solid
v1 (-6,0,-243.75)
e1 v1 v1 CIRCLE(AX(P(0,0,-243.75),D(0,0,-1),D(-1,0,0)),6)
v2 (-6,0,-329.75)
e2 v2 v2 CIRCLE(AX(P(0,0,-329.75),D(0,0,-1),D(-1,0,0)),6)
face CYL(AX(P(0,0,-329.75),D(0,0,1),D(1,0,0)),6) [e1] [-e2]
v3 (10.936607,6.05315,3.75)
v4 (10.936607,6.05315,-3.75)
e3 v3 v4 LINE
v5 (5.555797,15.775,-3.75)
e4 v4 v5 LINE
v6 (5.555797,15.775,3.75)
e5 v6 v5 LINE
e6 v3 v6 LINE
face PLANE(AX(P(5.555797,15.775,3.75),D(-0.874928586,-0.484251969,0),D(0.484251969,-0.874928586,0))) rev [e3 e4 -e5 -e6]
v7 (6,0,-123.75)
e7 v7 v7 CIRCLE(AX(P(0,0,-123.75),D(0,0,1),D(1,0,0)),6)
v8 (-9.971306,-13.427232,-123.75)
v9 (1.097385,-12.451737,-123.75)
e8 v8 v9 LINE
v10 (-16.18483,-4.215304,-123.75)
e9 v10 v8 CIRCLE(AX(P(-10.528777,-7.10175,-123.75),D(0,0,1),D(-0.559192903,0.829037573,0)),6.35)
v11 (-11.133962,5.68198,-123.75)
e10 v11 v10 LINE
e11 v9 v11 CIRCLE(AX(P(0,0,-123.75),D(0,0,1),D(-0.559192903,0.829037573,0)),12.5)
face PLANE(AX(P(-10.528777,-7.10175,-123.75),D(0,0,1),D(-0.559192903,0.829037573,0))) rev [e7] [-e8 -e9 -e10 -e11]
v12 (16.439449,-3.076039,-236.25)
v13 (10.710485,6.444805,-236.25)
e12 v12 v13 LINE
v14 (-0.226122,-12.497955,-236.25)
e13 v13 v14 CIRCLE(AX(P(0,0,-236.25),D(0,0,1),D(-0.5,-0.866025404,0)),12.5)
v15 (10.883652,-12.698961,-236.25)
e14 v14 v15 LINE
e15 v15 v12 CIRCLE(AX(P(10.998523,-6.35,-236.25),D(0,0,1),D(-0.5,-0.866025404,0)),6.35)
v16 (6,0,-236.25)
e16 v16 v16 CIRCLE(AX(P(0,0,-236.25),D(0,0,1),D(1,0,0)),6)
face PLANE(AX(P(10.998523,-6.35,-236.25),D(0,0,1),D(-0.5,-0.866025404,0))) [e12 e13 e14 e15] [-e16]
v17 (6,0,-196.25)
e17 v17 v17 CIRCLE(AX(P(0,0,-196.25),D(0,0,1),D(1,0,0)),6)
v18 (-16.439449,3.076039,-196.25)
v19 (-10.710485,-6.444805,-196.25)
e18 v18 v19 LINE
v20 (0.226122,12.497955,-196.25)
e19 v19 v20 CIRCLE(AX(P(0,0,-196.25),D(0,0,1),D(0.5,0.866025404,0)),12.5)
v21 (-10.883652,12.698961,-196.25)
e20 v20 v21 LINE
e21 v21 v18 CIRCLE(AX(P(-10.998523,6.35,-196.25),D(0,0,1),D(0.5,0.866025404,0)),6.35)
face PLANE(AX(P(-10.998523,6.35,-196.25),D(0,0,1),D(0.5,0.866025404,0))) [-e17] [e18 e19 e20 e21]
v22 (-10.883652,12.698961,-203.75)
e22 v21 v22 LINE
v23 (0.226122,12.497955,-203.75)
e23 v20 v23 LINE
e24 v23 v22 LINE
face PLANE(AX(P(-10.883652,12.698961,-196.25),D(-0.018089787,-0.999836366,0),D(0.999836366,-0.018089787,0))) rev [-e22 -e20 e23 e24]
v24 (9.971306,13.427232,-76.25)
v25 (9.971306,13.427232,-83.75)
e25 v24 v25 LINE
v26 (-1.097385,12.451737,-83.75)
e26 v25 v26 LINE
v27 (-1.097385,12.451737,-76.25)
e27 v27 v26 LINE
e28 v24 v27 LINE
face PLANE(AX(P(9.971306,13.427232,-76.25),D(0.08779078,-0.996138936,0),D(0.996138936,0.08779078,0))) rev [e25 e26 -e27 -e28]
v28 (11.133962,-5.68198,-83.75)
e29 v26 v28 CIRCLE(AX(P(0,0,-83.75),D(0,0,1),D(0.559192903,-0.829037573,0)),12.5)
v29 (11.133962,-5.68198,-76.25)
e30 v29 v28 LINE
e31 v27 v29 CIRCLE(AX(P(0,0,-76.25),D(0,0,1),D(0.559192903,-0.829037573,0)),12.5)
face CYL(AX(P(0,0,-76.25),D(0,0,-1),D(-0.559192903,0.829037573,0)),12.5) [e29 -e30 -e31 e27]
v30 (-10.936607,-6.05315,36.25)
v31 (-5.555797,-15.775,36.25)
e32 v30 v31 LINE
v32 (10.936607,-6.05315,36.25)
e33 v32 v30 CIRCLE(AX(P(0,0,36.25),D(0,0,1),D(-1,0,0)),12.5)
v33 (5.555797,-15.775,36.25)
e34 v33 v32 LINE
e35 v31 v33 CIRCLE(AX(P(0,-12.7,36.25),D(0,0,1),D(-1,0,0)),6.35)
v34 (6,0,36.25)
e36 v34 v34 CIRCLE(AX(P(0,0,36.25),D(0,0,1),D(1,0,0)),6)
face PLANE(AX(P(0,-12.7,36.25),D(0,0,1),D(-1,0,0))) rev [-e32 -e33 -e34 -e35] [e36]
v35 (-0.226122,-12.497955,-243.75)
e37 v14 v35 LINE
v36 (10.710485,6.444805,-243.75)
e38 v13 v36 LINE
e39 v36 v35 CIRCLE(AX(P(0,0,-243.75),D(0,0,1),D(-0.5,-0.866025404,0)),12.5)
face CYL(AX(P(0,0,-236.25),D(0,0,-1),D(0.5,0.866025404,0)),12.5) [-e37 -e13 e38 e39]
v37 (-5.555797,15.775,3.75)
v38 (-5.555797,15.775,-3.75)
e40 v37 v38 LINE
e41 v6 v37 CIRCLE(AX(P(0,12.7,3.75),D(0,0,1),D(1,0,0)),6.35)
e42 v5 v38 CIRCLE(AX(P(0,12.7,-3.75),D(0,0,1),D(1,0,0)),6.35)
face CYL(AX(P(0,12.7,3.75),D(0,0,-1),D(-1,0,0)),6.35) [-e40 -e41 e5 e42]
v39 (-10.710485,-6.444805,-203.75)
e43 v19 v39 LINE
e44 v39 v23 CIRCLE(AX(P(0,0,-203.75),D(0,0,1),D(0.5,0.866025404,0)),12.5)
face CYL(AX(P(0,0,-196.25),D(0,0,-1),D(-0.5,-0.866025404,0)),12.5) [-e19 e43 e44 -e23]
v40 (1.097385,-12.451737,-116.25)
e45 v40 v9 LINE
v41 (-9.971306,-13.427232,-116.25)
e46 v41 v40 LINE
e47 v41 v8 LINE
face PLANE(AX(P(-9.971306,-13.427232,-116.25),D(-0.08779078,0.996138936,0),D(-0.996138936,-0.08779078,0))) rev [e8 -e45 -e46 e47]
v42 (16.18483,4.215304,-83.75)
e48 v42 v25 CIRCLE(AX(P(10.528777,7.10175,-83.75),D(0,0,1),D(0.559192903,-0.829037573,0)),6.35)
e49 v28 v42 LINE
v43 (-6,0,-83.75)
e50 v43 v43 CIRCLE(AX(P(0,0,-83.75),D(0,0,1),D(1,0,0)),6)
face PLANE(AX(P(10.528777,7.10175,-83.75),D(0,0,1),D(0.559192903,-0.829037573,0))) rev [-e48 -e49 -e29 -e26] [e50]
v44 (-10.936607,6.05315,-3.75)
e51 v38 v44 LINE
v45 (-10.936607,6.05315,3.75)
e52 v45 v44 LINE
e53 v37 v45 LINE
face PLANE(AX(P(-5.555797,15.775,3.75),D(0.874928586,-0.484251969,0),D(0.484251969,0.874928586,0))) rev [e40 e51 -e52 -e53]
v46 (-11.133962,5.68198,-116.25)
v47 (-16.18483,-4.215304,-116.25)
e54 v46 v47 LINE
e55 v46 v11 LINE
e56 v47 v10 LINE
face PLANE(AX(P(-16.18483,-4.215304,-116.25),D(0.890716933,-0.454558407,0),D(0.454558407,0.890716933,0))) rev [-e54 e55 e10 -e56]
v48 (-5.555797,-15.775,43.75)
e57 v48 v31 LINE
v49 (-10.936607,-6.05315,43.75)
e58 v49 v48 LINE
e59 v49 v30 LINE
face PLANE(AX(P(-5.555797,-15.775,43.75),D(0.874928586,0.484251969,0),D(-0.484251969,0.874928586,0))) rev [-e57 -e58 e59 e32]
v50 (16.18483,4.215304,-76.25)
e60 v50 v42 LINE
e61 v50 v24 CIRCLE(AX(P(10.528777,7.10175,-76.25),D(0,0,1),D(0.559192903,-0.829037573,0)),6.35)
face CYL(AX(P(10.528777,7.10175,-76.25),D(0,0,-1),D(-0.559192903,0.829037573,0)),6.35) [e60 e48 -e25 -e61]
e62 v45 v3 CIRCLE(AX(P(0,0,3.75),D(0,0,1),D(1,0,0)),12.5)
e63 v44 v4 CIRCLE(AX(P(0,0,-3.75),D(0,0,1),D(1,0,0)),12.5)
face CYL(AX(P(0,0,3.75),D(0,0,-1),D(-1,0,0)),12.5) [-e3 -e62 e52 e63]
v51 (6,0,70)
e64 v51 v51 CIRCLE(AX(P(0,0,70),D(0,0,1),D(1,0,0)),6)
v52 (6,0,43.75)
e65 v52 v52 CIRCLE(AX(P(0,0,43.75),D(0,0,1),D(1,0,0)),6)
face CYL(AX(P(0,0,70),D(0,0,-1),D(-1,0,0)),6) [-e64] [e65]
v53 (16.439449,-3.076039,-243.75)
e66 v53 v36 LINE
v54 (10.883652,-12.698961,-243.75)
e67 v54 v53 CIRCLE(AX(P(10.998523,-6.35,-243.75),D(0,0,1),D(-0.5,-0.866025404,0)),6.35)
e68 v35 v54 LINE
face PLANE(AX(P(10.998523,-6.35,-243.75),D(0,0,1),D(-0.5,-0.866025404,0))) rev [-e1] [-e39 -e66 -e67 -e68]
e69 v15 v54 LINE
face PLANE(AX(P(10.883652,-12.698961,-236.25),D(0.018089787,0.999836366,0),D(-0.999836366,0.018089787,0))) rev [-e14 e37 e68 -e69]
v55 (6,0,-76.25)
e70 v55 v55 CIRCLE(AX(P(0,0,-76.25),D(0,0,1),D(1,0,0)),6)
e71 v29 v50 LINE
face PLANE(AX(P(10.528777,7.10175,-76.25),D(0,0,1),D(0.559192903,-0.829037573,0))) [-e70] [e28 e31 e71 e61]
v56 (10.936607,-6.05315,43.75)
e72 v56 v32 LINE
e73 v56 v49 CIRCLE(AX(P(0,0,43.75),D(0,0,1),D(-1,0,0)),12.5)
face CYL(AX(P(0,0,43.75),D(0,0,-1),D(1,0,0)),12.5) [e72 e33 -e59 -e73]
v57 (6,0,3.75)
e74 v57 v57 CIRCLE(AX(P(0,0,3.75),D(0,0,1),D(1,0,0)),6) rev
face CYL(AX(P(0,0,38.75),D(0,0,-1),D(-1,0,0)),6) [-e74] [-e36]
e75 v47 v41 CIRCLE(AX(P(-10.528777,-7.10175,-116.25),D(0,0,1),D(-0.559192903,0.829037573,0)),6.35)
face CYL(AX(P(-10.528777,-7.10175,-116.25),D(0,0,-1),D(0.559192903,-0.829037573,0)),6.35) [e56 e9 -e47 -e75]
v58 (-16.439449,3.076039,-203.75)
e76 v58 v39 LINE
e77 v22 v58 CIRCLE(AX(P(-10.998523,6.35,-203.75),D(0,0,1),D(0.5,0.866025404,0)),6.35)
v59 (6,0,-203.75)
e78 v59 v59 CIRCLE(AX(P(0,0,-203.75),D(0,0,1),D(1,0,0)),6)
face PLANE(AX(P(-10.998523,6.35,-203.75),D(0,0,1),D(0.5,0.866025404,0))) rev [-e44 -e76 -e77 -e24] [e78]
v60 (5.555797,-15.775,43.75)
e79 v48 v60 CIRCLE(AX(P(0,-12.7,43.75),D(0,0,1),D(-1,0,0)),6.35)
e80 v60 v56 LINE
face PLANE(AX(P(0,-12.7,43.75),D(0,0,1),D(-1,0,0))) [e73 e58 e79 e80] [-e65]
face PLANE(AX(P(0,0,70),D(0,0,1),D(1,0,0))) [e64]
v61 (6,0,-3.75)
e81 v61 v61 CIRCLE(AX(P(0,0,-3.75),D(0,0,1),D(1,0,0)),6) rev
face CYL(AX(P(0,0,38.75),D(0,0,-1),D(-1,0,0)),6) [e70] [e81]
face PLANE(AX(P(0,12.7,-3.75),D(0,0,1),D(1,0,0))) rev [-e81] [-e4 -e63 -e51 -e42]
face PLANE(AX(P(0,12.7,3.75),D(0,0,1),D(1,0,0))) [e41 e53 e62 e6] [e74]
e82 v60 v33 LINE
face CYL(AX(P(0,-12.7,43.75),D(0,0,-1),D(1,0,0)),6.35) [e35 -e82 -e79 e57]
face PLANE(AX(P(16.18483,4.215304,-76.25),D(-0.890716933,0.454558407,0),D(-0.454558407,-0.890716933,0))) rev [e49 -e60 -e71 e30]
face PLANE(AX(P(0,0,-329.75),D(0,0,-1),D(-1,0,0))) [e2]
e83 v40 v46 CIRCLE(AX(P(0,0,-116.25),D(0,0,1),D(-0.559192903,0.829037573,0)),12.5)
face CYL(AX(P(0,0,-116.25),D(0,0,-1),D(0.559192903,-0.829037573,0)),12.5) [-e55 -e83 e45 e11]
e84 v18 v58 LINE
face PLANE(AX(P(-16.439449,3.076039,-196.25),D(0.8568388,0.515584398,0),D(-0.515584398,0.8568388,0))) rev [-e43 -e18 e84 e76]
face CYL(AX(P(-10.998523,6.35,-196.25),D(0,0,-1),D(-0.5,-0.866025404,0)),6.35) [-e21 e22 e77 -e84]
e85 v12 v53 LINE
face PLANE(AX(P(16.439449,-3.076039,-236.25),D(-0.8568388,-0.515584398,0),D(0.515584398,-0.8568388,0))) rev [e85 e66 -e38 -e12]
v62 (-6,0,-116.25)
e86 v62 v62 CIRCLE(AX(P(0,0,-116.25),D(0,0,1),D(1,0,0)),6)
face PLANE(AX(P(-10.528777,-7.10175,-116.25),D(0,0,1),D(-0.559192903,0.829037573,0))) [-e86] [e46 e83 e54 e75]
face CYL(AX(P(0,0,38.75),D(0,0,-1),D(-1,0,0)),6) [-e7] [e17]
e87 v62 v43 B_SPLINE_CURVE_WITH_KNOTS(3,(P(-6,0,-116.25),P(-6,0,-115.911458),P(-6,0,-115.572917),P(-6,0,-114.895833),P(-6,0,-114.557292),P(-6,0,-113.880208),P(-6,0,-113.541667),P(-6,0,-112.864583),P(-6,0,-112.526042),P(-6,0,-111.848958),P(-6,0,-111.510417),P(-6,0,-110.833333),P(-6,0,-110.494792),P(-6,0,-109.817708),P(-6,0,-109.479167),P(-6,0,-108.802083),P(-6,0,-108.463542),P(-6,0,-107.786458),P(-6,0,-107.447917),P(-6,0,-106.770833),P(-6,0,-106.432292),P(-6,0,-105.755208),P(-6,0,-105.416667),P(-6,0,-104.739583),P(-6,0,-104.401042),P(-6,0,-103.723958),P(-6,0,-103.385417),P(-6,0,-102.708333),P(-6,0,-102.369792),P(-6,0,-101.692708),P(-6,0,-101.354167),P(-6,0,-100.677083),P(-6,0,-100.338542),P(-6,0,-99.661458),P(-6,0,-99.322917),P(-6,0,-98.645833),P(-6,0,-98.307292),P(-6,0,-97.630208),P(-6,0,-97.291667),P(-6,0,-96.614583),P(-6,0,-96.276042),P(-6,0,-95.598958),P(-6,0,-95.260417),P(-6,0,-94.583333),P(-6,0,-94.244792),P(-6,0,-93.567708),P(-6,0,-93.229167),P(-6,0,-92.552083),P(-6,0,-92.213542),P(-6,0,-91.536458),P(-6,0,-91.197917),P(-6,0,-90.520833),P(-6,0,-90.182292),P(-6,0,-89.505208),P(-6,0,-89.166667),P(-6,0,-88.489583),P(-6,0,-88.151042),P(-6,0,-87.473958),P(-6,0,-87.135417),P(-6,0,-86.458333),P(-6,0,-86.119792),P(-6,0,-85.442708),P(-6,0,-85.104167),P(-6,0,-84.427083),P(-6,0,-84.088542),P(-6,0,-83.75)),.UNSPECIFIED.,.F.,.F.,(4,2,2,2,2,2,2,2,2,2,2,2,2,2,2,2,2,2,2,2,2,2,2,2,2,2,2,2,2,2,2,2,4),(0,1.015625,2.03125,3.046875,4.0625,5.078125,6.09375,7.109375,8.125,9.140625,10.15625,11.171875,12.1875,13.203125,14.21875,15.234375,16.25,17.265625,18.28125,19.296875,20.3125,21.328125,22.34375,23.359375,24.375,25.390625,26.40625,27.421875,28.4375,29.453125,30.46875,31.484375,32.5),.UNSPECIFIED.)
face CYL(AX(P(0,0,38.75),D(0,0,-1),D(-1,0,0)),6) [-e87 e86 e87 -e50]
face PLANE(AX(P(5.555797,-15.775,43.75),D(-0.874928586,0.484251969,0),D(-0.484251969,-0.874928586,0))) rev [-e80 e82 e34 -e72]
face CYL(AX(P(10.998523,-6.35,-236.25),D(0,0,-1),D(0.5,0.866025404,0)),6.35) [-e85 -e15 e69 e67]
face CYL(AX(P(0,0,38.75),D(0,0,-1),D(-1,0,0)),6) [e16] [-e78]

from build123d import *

# Parameters (mm, degrees)
SALIENTE_EXTRUIR1_DEPTH      = 3.75
S_LIDO_MOVER_COPIAR2_ANGLE   = 180
S_LIDO_MOVER_COPIAR4_START   = -243.75
S_LIDO_MOVER_COPIAR4_DEPTH   = 7.5
S_LIDO_MOVER_COPIAR4_START_2 = -203.75
S_LIDO_MOVER_COPIAR4_2_DEPTH = 7.5
S_LIDO_MOVER_COPIAR4_START_3 = -123.75
S_LIDO_MOVER_COPIAR4_3_DEPTH = 7.5
S_LIDO_MOVER_COPIAR4_START_4 = -83.75
S_LIDO_MOVER_COPIAR4_4_DEPTH = 7.5
S_LIDO_MOVER_COPIAR5_ANGLE   = 124
S_LIDO_MOVER_COPIAR6_ANGLE   = 120
CROQUIS5_R                   = 6
SALIENTE_EXTRUIR4_DEPTH      = 275
SALIENTE_EXTRUIR5_START      = 86
CROQUIS6_R                   = 6
SALIENTE_EXTRUIR5_DEPTH      = 86
CROQUIS7_R                   = 6
SALIENTE_EXTRUIR6_DEPTH      = 26.25


# Read off the part's stored shape, not the designer's step: Sólido-Mover/Copiar4
with BuildPart() as part:
    # Croquis1 → Saliente-Extruir1 (new, symmetric)
    with BuildSketch(Plane.XY):
        with BuildLine():
            Line((-5.555796523, 15.775), (-10.936607328, 6.053149606))
            ThreePointArc((-10.936607328, 6.053149606), (0, -12.5), (10.936607328, 6.053149606))
            Line((10.936607328, 6.053149606), (5.555796523, 15.775))
            ThreePointArc((5.555796523, 15.775), (0, 19.05), (-5.555796523, 15.775))
        make_face()
    extrude(amount=SALIENTE_EXTRUIR1_DEPTH, both=True)


with BuildPart() as body_2:
    # Sólido-Mover/Copiar1: copy of part
    add(part.part.moved(Location((0, 0, 40))))


with BuildPart() as body_2_1:
    # Sólido-Mover/Copiar2: moved
    add(body_2.part.rotate(Axis((0, 0, 0), (0, 0, 1)), S_LIDO_MOVER_COPIAR2_ANGLE))


with BuildPart() as body_3:
    # Sólido-Mover/Copiar4 outline → Sólido-Mover/Copiar4 (new body)
    with BuildSketch(Plane.XY.offset(S_LIDO_MOVER_COPIAR4_START)):
        with BuildLine():
            ThreePointArc((5.555796523, 15.775), (0, 19.05), (-5.555796523, 15.775))
            Line((-5.555796523, 15.775), (-10.936607328, 6.053149606))
            ThreePointArc((-10.936607328, 6.053149606), (-12.5, 0), (-10.936607328, -6.053149606))
            ThreePointArc((-10.936607328, -6.053149606), (0, -12.5), (10.936607328, -6.053149606))
            ThreePointArc((10.936607328, -6.053149606), (12.5, 0), (10.936607328, 6.053149606))
            Line((10.936607328, 6.053149606), (5.555796523, 15.775))
        make_face()
    extrude(amount=S_LIDO_MOVER_COPIAR4_DEPTH)


with BuildPart() as body_4:
    # S_lido-Mover_Copiar4 2 outline → S_lido-Mover_Copiar4 2 (new body)
    with BuildSketch(Plane.XY.offset(S_LIDO_MOVER_COPIAR4_START_2)):
        with BuildLine():
            Line((-10.936607328, -6.053149606), (-5.555796523, -15.775))
            ThreePointArc((-5.555796523, -15.775), (0, -19.05), (5.555796523, -15.775))
            Line((5.555796523, -15.775), (10.936607328, -6.053149606))
            ThreePointArc((10.936607328, -6.053149606), (0, 12.5), (-10.936607328, -6.053149606))
        make_face()
    extrude(amount=S_LIDO_MOVER_COPIAR4_2_DEPTH)


with BuildPart() as body_5:
    # S_lido-Mover_Copiar4 3 outline → S_lido-Mover_Copiar4 3 (new body)
    with BuildSketch(Plane.XY.offset(S_LIDO_MOVER_COPIAR4_START_3)):
        with BuildLine():
            ThreePointArc((5.555796523, 15.775), (0, 19.05), (-5.555796523, 15.775))
            Line((-5.555796523, 15.775), (-10.936607328, 6.053149606))
            ThreePointArc((-10.936607328, 6.053149606), (-12.5, 0), (-10.936607328, -6.053149606))
            ThreePointArc((-10.936607328, -6.053149606), (0, -12.5), (10.936607328, -6.053149606))
            ThreePointArc((10.936607328, -6.053149606), (12.5, 0), (10.936607328, 6.053149606))
            Line((10.936607328, 6.053149606), (5.555796523, 15.775))
        make_face()
    extrude(amount=S_LIDO_MOVER_COPIAR4_3_DEPTH)


with BuildPart() as body_6:
    # S_lido-Mover_Copiar4 4 outline → S_lido-Mover_Copiar4 4 (new body)
    with BuildSketch(Plane.XY.offset(S_LIDO_MOVER_COPIAR4_START_4)):
        with BuildLine():
            Line((-10.936607328, -6.053149606), (-5.555796523, -15.775))
            ThreePointArc((-5.555796523, -15.775), (0, -19.05), (5.555796523, -15.775))
            Line((5.555796523, -15.775), (10.936607328, -6.053149606))
            ThreePointArc((10.936607328, -6.053149606), (0, 12.5), (-10.936607328, -6.053149606))
        make_face()
    extrude(amount=S_LIDO_MOVER_COPIAR4_4_DEPTH)


with BuildPart() as body_6_1:
    # Sólido-Mover/Copiar5: moved
    add(body_6.part.rotate(Axis((0, 0, 0), (0, 0, 1)), S_LIDO_MOVER_COPIAR5_ANGLE))


with BuildPart() as body_5_1:
    # Sólido-Mover/Copiar5: moved
    add(body_5.part.rotate(Axis((0, 0, 0), (0, 0, 1)), S_LIDO_MOVER_COPIAR5_ANGLE))


with BuildPart() as body_3_1:
    # Sólido-Mover/Copiar6: moved
    add(body_3.part.rotate(Axis((0, 0, 0), (0, 0, -1)), S_LIDO_MOVER_COPIAR6_ANGLE))


with BuildPart() as body_4_1:
    # Sólido-Mover/Copiar6: moved
    add(body_4.part.rotate(Axis((0, 0, 0), (0, 0, -1)), S_LIDO_MOVER_COPIAR6_ANGLE))


with BuildPart() as part_1:
    add(part.part)

    add(body_2_1.part)  # Saliente-Extruir4 merges body 2

    add(body_3_1.part)  # Saliente-Extruir4 merges body 3

    add(body_4_1.part)  # Saliente-Extruir4 merges body 4

    add(body_5_1.part)  # Saliente-Extruir4 merges body 5

    add(body_6_1.part)  # Saliente-Extruir4 merges body 6
    # Croquis5 → Saliente-Extruir4 (add)
    with BuildSketch(Plane.XY.offset(-236.25)):
        Circle(CROQUIS5_R)
    extrude(amount=SALIENTE_EXTRUIR4_DEPTH)

    # Croquis6 → Saliente-Extruir5 (add)
    with BuildSketch(Plane(origin=(0, 0, -243.75), x_dir=(-1, 0, 0), z_dir=(0, 0, -1)).offset(SALIENTE_EXTRUIR5_START)):
        with Locations(Location((0, 0, 0), (0, 0, 180))):
            Circle(CROQUIS6_R)
    extrude(amount=-SALIENTE_EXTRUIR5_DEPTH)

    # Croquis7 → Saliente-Extruir6 (add)
    with BuildSketch(Plane.XY.offset(43.75)):
        Circle(CROQUIS7_R)
    extrude(amount=SALIENTE_EXTRUIR6_DEPTH)


solid = part_1.part
